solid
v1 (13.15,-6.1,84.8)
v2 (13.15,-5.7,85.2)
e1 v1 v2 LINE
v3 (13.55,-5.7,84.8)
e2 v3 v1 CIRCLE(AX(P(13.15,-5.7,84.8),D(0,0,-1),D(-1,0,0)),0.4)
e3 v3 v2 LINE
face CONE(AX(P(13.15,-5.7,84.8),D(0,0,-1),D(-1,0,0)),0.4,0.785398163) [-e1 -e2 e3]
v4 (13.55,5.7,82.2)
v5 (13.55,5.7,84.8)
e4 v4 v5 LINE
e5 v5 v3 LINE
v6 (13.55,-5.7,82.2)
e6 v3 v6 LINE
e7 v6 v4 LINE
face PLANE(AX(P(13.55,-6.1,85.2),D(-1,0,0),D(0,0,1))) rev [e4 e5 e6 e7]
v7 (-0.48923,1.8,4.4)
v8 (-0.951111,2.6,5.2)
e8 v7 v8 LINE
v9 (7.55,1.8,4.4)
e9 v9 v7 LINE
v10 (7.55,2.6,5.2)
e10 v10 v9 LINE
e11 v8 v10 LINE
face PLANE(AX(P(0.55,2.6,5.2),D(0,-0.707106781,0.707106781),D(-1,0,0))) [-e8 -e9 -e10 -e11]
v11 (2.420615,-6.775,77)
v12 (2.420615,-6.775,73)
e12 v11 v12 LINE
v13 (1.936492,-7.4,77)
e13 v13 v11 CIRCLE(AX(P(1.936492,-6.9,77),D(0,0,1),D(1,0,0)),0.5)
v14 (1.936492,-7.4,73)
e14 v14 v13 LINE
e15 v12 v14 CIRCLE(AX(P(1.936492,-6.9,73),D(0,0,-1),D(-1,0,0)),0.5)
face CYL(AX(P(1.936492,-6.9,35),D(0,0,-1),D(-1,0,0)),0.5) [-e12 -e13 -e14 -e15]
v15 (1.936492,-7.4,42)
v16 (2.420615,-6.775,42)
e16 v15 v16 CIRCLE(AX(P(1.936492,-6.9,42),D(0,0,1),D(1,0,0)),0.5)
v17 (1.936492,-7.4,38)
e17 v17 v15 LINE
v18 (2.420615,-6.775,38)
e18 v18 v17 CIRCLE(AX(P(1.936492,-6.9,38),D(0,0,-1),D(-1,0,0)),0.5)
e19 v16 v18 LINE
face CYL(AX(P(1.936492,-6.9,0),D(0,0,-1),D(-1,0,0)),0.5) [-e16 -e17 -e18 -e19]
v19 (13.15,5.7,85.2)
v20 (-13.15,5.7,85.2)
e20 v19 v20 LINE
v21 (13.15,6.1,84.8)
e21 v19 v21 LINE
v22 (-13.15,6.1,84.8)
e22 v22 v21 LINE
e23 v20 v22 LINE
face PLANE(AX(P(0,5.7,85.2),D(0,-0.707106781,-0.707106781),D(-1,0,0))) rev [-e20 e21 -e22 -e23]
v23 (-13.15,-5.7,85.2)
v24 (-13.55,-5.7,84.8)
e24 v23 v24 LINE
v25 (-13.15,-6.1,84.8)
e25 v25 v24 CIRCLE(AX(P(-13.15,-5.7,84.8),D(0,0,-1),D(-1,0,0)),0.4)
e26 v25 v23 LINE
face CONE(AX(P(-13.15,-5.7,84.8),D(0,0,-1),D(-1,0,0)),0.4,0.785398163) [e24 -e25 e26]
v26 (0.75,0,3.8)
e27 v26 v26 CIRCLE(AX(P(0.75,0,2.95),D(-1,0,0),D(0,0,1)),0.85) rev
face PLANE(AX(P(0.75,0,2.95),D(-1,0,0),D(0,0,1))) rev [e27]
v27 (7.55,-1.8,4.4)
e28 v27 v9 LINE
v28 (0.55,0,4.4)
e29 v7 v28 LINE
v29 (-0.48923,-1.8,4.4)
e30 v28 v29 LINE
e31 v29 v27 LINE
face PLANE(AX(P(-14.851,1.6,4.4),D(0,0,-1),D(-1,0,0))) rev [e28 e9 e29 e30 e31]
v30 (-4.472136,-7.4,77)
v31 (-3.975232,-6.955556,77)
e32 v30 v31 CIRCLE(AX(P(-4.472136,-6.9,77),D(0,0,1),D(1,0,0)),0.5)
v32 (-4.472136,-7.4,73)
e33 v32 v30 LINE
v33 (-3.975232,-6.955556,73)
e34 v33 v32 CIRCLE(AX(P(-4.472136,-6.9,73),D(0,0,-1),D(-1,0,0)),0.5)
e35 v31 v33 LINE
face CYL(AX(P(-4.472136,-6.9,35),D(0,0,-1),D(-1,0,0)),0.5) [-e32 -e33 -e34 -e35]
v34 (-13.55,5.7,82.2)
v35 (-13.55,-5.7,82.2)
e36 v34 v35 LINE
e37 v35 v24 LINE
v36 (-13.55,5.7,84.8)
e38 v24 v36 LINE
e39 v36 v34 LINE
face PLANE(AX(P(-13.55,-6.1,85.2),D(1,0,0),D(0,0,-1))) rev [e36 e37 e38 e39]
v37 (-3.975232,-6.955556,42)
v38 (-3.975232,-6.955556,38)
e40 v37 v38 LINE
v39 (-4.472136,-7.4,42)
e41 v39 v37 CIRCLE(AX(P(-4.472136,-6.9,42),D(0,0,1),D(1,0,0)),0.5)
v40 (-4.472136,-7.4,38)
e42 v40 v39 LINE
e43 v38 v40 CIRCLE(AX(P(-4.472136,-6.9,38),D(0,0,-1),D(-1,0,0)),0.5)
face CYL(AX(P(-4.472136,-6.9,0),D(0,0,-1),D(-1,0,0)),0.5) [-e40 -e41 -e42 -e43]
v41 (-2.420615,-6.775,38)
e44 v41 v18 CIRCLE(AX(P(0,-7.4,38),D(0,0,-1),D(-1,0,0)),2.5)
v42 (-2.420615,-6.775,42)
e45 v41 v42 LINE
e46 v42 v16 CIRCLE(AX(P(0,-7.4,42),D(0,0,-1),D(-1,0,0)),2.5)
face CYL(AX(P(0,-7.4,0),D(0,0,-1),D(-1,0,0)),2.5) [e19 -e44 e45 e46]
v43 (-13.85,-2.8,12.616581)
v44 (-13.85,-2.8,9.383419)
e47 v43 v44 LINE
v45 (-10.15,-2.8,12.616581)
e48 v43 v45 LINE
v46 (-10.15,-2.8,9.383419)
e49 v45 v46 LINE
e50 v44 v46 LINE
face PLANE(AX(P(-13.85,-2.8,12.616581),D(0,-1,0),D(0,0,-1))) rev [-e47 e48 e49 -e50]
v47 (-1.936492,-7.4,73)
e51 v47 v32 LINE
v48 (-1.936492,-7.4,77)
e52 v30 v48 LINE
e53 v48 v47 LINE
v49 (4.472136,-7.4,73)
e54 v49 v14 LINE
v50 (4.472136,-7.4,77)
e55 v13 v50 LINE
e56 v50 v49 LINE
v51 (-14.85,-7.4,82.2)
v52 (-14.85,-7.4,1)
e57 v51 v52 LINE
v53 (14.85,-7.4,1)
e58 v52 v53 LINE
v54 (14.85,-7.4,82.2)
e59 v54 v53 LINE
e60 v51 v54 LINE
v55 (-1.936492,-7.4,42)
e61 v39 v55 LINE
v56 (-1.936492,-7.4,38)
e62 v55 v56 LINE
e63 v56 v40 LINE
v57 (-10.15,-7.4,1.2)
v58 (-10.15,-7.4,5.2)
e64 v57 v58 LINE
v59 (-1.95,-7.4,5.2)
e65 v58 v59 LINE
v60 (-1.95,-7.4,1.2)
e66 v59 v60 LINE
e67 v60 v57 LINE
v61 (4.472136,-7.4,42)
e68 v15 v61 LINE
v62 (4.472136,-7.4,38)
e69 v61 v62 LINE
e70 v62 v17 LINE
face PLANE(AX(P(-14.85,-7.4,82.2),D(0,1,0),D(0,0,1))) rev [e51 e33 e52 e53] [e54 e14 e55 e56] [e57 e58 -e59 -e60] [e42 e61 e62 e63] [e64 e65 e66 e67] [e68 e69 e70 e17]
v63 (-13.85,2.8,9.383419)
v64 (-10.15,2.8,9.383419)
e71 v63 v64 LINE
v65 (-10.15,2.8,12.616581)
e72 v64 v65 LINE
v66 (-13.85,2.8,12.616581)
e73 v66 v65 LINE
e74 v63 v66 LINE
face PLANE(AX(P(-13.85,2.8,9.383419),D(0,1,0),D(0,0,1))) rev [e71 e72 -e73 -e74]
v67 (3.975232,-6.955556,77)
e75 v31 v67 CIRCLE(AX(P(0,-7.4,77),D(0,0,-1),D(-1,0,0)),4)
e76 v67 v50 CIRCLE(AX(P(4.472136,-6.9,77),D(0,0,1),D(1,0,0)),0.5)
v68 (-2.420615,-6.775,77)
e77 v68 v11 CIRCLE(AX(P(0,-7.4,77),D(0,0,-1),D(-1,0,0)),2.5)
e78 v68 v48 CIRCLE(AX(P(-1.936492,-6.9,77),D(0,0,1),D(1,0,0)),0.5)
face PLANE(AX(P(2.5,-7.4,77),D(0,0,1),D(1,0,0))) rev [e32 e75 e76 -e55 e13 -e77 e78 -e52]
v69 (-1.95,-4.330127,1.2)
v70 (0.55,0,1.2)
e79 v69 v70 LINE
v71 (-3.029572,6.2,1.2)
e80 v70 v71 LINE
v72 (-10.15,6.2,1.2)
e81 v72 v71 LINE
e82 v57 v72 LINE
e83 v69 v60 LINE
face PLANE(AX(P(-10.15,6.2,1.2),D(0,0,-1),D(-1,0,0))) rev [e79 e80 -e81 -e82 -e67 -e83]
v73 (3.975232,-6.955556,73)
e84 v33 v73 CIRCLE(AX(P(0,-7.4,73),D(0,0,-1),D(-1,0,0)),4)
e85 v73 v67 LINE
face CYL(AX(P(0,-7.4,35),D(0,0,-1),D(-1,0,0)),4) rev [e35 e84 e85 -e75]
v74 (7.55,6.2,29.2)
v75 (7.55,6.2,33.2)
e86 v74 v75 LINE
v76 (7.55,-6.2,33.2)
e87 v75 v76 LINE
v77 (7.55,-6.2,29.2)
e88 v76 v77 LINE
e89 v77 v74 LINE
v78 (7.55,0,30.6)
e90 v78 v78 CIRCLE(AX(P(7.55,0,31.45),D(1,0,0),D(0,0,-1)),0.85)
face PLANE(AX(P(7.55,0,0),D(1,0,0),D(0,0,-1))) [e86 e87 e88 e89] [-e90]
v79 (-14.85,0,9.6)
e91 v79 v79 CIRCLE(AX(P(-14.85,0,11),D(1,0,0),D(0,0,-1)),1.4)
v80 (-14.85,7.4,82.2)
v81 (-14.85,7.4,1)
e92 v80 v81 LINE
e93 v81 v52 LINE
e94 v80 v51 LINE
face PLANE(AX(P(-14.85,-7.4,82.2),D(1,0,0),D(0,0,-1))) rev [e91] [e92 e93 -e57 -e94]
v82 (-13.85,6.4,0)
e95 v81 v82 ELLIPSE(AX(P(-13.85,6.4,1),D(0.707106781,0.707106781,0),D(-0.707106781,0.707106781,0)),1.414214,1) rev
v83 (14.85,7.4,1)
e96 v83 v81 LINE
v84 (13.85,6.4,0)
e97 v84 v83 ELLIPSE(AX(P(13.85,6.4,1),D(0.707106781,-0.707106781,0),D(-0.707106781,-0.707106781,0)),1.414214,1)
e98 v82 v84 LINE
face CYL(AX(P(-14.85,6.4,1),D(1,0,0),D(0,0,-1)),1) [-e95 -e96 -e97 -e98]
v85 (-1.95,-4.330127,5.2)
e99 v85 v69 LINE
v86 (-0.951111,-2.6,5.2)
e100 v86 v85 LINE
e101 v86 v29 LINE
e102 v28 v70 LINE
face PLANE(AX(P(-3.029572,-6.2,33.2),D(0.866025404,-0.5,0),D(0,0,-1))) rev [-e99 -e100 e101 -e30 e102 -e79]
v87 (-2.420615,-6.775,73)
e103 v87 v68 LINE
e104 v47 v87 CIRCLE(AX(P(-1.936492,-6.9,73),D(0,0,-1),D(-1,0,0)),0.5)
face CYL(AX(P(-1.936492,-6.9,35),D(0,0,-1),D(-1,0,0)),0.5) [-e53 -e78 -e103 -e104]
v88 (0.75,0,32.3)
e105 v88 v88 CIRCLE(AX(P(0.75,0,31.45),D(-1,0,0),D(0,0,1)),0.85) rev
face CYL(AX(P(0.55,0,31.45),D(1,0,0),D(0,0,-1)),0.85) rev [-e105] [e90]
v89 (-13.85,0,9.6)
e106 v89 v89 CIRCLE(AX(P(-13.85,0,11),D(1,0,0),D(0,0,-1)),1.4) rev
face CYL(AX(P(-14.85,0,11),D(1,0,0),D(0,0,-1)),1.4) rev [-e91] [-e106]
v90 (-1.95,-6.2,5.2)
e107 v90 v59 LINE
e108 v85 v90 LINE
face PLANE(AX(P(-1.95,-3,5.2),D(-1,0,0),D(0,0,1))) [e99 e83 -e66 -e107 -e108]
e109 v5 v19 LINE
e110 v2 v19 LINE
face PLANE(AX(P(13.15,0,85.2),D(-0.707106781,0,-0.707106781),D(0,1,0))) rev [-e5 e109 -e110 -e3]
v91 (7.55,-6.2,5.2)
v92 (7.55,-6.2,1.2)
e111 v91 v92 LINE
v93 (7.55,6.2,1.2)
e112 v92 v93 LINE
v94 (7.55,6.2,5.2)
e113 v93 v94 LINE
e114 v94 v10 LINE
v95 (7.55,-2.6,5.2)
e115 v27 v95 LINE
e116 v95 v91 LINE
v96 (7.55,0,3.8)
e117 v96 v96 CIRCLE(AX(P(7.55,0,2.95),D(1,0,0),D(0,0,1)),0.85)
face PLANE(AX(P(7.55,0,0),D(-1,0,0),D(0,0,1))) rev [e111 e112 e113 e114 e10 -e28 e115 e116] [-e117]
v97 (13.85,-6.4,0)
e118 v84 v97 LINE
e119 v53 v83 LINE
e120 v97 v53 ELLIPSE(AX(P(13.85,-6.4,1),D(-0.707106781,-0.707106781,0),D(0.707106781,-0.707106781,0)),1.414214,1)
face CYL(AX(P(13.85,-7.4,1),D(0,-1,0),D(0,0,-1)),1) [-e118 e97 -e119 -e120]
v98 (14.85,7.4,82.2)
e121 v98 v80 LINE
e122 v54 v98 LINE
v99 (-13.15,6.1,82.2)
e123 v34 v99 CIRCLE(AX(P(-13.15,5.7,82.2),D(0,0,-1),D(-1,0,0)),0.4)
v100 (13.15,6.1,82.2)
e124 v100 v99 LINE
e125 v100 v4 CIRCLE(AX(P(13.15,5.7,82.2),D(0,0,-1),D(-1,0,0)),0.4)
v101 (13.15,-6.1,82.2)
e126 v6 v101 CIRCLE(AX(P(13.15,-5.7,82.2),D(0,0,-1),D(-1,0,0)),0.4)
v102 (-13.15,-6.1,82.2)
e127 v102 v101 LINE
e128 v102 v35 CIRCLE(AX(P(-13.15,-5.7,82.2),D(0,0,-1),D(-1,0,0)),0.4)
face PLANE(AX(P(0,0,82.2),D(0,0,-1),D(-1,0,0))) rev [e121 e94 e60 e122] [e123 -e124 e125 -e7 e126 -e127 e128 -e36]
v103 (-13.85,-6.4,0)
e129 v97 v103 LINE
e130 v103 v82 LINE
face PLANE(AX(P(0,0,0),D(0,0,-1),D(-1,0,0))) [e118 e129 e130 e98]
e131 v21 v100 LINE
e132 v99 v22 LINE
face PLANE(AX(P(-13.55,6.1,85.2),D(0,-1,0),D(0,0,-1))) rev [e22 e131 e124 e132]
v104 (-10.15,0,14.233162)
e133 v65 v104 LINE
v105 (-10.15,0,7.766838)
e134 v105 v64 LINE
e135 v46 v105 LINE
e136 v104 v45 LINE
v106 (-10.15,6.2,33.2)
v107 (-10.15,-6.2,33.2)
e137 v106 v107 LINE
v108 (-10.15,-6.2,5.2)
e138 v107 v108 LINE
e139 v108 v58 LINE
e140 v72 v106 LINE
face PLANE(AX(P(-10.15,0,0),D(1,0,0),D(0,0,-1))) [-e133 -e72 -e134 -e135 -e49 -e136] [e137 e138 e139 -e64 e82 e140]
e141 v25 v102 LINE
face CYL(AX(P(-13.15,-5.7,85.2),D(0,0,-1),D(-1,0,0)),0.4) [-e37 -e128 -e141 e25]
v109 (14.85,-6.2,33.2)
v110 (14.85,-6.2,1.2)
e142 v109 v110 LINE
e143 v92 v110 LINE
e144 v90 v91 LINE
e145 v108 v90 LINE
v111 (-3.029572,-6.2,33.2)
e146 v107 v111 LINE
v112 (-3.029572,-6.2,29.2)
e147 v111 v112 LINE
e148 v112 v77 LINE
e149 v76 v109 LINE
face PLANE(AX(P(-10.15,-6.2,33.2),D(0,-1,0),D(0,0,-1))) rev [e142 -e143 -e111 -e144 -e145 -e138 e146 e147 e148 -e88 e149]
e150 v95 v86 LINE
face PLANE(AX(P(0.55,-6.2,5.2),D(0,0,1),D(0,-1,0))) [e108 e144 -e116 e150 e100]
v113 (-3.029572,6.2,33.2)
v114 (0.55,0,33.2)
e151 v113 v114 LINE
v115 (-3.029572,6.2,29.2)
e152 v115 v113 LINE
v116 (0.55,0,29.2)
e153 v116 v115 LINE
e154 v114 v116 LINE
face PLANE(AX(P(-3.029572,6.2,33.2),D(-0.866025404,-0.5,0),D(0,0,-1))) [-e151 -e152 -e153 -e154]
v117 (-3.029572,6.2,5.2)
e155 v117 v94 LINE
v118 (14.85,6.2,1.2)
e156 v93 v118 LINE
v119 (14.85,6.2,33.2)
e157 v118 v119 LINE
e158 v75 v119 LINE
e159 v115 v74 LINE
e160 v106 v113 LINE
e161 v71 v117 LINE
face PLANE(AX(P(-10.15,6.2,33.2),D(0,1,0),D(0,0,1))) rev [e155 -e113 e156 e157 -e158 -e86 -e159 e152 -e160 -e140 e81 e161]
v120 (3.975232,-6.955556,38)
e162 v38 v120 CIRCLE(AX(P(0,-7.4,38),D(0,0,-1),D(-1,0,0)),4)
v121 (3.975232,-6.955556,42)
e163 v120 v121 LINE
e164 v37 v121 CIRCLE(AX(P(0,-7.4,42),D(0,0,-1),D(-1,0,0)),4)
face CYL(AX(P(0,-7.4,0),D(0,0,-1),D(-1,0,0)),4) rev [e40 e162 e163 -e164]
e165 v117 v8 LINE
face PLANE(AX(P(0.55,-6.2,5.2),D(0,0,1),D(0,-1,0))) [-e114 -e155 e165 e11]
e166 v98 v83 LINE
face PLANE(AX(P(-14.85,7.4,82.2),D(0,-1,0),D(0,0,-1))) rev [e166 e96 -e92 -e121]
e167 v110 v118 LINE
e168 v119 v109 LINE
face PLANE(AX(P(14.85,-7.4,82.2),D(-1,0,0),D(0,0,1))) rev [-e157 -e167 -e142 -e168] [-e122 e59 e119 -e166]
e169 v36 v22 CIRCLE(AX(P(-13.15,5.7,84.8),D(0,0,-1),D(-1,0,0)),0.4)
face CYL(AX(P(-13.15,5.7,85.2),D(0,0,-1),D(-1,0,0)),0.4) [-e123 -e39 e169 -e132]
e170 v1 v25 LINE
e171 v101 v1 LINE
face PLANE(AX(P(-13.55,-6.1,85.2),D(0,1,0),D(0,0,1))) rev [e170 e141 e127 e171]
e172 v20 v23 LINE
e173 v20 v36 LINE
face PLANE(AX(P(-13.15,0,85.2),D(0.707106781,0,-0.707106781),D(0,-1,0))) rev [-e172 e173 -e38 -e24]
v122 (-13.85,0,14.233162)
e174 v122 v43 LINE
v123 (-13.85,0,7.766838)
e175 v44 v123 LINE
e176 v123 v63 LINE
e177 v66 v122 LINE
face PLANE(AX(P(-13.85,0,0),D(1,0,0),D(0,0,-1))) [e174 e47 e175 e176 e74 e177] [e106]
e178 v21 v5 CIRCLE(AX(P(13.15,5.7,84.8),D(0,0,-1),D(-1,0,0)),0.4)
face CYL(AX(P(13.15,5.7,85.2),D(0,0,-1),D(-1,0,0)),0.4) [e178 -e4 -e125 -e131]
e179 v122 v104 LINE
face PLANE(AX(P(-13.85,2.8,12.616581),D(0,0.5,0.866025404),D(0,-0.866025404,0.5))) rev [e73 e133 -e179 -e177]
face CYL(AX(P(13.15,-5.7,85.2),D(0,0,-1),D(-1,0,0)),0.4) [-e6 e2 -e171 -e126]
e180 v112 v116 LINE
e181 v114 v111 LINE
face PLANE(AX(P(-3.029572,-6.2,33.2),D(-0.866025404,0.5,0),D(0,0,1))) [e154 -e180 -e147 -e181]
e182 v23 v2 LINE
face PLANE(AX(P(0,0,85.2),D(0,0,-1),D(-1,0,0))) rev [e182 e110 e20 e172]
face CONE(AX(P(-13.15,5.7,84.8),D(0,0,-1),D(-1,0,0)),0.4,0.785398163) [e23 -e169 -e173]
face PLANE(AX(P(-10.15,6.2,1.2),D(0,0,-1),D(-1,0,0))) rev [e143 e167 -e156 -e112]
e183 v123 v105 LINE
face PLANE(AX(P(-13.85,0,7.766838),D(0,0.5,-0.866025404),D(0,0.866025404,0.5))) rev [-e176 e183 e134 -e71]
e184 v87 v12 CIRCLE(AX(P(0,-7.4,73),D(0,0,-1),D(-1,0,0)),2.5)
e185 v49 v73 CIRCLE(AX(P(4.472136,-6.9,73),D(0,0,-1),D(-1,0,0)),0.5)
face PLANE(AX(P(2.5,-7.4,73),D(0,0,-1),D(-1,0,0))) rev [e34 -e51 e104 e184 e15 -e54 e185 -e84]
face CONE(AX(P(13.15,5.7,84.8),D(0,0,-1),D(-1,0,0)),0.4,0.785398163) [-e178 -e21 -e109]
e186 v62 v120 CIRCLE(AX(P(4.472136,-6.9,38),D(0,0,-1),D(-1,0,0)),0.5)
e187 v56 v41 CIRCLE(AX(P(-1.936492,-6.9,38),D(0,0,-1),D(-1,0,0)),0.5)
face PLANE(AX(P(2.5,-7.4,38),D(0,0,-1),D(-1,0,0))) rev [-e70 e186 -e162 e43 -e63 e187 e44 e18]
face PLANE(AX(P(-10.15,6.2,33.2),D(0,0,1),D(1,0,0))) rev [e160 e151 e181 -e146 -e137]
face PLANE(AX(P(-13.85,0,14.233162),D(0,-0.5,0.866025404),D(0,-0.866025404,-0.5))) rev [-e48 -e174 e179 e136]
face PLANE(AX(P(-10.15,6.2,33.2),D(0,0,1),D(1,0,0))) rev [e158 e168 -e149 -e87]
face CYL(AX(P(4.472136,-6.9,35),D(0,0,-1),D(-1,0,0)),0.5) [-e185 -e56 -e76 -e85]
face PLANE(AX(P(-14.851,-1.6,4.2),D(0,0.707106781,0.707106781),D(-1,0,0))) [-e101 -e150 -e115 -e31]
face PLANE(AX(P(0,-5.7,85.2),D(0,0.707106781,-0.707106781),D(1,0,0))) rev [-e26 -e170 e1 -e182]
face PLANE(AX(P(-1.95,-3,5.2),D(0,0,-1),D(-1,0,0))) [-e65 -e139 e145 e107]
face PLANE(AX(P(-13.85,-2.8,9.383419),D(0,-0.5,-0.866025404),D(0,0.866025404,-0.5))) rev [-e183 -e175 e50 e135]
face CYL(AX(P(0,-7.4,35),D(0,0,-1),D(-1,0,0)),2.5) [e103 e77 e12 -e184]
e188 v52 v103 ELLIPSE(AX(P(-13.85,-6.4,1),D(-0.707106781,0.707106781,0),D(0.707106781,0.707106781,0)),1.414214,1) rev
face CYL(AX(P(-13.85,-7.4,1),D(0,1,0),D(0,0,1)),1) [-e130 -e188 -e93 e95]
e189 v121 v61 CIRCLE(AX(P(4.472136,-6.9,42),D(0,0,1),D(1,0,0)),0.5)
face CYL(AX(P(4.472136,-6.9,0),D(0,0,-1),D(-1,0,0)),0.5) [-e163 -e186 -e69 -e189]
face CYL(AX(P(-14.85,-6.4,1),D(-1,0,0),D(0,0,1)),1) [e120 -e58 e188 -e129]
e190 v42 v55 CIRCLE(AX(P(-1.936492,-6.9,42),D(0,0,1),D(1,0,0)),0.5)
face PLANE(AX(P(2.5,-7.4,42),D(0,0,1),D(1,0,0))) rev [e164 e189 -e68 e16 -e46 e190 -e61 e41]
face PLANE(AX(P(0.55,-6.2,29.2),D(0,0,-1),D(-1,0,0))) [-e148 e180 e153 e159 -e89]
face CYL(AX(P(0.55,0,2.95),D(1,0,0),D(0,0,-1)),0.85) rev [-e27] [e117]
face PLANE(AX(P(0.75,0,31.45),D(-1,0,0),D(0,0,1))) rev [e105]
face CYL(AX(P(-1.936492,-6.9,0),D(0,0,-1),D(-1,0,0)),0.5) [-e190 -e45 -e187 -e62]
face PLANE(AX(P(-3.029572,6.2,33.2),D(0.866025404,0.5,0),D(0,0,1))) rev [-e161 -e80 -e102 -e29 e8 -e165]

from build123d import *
from OCP.BRepFilletAPI import BRepFilletAPI_MakeChamfer

# Parameters (mm, degrees)
IZIM1_W                     = 29.7
IZIM1_H                     = 14.8
Y_KSEKLIK_EKSTR_ZYON1_DEPTH = 82.2
IZIM2_W                     = 32
IZIM2_H                     = 12.4
KES_EKSTR_ZYON1_DEPTH       = 25
Y_KSEKLIK_EKSTR_ZYON2_START = -7.3
IZIM3_W                     = 4
IZIM3_H                     = 12.4
IZIM3_R                     = 0.85
Y_KSEKLIK_EKSTR_ZYON2_DEPTH = 7
Y_KSEKLIK_EKSTR_ZYON3_START = -0.2
IZIM4_R                     = 0.85
Y_KSEKLIK_EKSTR_ZYON3_DEPTH = 0.2
PAH1_SIZE                   = 3.579571669
PAH1_SIZE_2                 = 6.2
KES_EKSTR_ZYON2_DEPTH       = 3.2
KES_EKSTR_ZYON2_DEPTH_BACK  = 85.630505729
IZIM5_W                     = 8.2
IZIM5_H                     = 4
RADYUS1_R                   = 1
IZIM7_R                     = 1.4
KES_EKSTR_ZYON3_DEPTH       = 87.235723456
IZIM8_W                     = 27.1
IZIM8_H                     = 12.2
Y_KSEKLIK_EKSTR_ZYON4_DEPTH = 3
RADYUS2_R                   = 0.4
IZIM9_W                     = 1.5
IZIM9_H                     = 4
L_O_ALTMA1_COUNT            = 2
L_O_ALTMA1_PITCH            = 35
RADYUS3_R                   = 0.5
KES_EKSTR_ZYON4_REACH       = 90.406
IZIM10_W                    = 0.8
IZIM10_H                    = 3.2
PAH3_SIZE                   = 1
PAH4_SIZE                   = 0.4
KES_EKSTR_ZYON5_DEPTH       = 3.7


# Some blends are built 0.0001 mm under size
with BuildPart() as part:
    # Çizim1 → Yükseklik-Ekstrüzyon1 (new body)
    with BuildSketch(Plane.XY):
        Rectangle(IZIM1_W, IZIM1_H)
    extrude(amount=Y_KSEKLIK_EKSTR_ZYON1_DEPTH)

    # Çizim2 → Kes-Ekstrüzyon1 (cut)
    with BuildSketch(Plane(origin=(14.85, 0, 0), x_dir=(0, 0, -1), z_dir=(1, 0, 0))):
        with Locations((-17.2, 0)):
            Rectangle(IZIM2_W, IZIM2_H)
    extrude(amount=-KES_EKSTR_ZYON1_DEPTH, mode=Mode.SUBTRACT)

    # Çizim3 → Yükseklik-Ekstrüzyon2 (add)
    # profile 1 of 2: a face of its own
    with BuildSketch(Plane(origin=(14.85, 0, 0), x_dir=(0, 0, -1), z_dir=(1, 0, 0)).offset(Y_KSEKLIK_EKSTR_ZYON2_START)):
        with Locations((-31.2, 0)):
            Rectangle(IZIM3_W, IZIM3_H)
        with Locations((-31.45, 0)):
            Circle(IZIM3_R, mode=Mode.SUBTRACT)
    # profile 2 of 2: a face of its own
    with BuildSketch(Plane(origin=(14.85, 0, 0), x_dir=(0, 0, -1), z_dir=(1, 0, 0)).offset(Y_KSEKLIK_EKSTR_ZYON2_START)):
        with Locations((-3.2, 0)):
            Rectangle(IZIM3_W, IZIM3_H)
        with Locations(Location((-2.95, 0, 0), (0, 0, 180))):
            Circle(IZIM3_R, mode=Mode.SUBTRACT)
    extrude(amount=-Y_KSEKLIK_EKSTR_ZYON2_DEPTH)

    # Çizim4 → Yükseklik-Ekstrüzyon3 (add)
    with BuildSketch(Plane.ZY.offset(-0.55).offset(Y_KSEKLIK_EKSTR_ZYON3_START)):
        with Locations(Location((31.45, 0, 0), (0, 0, 180))):
            Circle(IZIM4_R)
        with Locations((2.95, 0)):
            Circle(IZIM4_R)
    extrude(amount=Y_KSEKLIK_EKSTR_ZYON3_DEPTH)

    # Pah1
    pah1_edges_1 = [part.edges().sort_by_distance(p)[0] for p in [
        (0.55, -6.2, 3.2),
    ]]
    pah1_side_1 = [part.faces().sort_by_distance(p)[0] for p in [
        (0.478408567, -6.2, 3.2),
    ]]
    pah1_edges_2 = [part.edges().sort_by_distance(p)[0] for p in [
        (0.55, 6.2, 3.2),
    ]]
    pah1_side_2 = [part.faces().sort_by_distance(p)[0] for p in [
        (0.478408567, 6.2, 3.2),
    ]]
    pah1_edges_3 = [part.edges().sort_by_distance(p)[0] for p in [
        (0.55, -6.2, 31.2),
    ]]
    pah1_side_3 = [part.faces().sort_by_distance(p)[0] for p in [
        (0.478408567, -6.2, 31.2),
    ]]
    pah1_edges_4 = [part.edges().sort_by_distance(p)[0] for p in [
        (0.55, 6.2, 31.2),
    ]]
    pah1_side_4 = [part.faces().sort_by_distance(p)[0] for p in [
        (0.478408567, 6.2, 31.2),
    ]]
    pah1 = BRepFilletAPI_MakeChamfer(part.part.solid().wrapped)
    for e in pah1_edges_1:
        pah1.Add(PAH1_SIZE - 0.0001, PAH1_SIZE_2 - 0.0001, e.wrapped, pah1_side_1[0].wrapped)
    for e in pah1_edges_2:
        pah1.Add(PAH1_SIZE - 0.0001, PAH1_SIZE_2 - 0.0001, e.wrapped, pah1_side_2[0].wrapped)
    for e in pah1_edges_3:
        pah1.Add(PAH1_SIZE - 0.0001, PAH1_SIZE_2 - 0.0001, e.wrapped, pah1_side_3[0].wrapped)
    for e in pah1_edges_4:
        pah1.Add(PAH1_SIZE - 0.0001, PAH1_SIZE_2 - 0.0001, e.wrapped, pah1_side_4[0].wrapped)
    add(Compound.cast(pah1.Shape()), mode=Mode.REPLACE)  # a hair under: the kernel refuses the full size

    # Çizim5 → Kes-Ekstrüzyon2 (cut, two sides: drawn at the far end of the back side and taken through both)
    with BuildSketch(Plane(origin=(0, -6.2, 0), x_dir=(1, 0, 0), z_dir=(0, 1, 0)).offset(-KES_EKSTR_ZYON2_DEPTH_BACK)):
        with Locations((-6.05, -3.2)):
            Rectangle(IZIM5_W, IZIM5_H)
    extrude(amount=KES_EKSTR_ZYON2_DEPTH + KES_EKSTR_ZYON2_DEPTH_BACK, mode=Mode.SUBTRACT)

    # Radyus1
    radyus1_edges = [part.edges().sort_by_distance(p)[0] for p in [
        (0, -7.4, 0),
        (-14.85, 0, 0),
        (0, 7.4, 0),
        (14.85, 0, 0),
    ]]
    fillet(radyus1_edges, radius=RADYUS1_R)

    # Çizim7 → Kes-Ekstrüzyon3 (cut, through all)
    with BuildSketch(Plane(origin=(-10.15, 0, 0), x_dir=(0, 0, -1), z_dir=(1, 0, 0))):
        with Locations((-11, 0)):
            Circle(IZIM7_R)
    extrude(amount=-KES_EKSTR_ZYON3_DEPTH, mode=Mode.SUBTRACT)

    # Çizim8 → Yükseklik-Ekstrüzyon4 (add)
    with BuildSketch(Plane.XY.offset(82.2)):
        Rectangle(IZIM8_W, IZIM8_H)
    extrude(amount=Y_KSEKLIK_EKSTR_ZYON4_DEPTH)

    # Radyus2
    radyus2_edges = [part.edges().sort_by_distance(p)[0] for p in [
        (13.55, -6.1, 83.7),
        (13.55, 6.1, 83.7),
        (-13.55, 6.1, 83.7),
        (-13.55, -6.1, 83.7),
    ]]
    fillet(radyus2_edges, radius=RADYUS2_R)

    # Çizim9 → Kes-Döndür1 (revolve, cut)
    with BuildSketch(Plane.XZ.offset(7.4)):
        with Locations((3.25, 40)):
            Rectangle(IZIM9_W, IZIM9_H)
    kes_d_nd_r1 = revolve(axis=Axis((0, -7.4, 0), (0, 0, 1)), mode=Mode.SUBTRACT)

    # LÇoğaltma1: Kes-Döndür1 ×2
    with Locations(*[(0, 0, i * L_O_ALTMA1_PITCH) for i in range(1, L_O_ALTMA1_COUNT)]):
        add(kes_d_nd_r1, mode=Mode.SUBTRACT)

    # Radyus3
    radyus3_edges = [part.edges().sort_by_distance(p)[0] for p in [
        (2.5, -7.4, 40),
        (4, -7.4, 40),
        (-2.5, -7.4, 40),
        (-4, -7.4, 40),
        (4, -7.4, 75),
        (-4, -7.4, 75),
        (2.5, -7.4, 75),
        (-2.5, -7.4, 75),
    ]]
    fillet(radyus3_edges, radius=RADYUS3_R)

    # Çizim10 → Kes-Ekstrüzyon4 (cut, up to next)
    with BuildSketch(Plane(origin=(7.55, 0, 0), x_dir=(0, 0, -1), z_dir=(1, 0, 0)), mode=Mode.PRIVATE) as kes_ekstr_zyon4_sk1:
        with Locations((-4.8, 0)):
            Rectangle(IZIM10_W, IZIM10_H)
    kes_ekstr_zyon4_tool1 = extrude(kes_ekstr_zyon4_sk1.sketch, amount=-KES_EKSTR_ZYON4_REACH, mode=Mode.PRIVATE) & part.part
    add(kes_ekstr_zyon4_tool1.solids().sort_by_distance((7.55, 0, 4.8))[0], mode=Mode.SUBTRACT)

    # Pah3
    # the kernel refuses this chamfer: 1 mm, written as the material it takes off along each edge
    with BuildSketch(Plane(origin=(10.121682988, -1.6, 5.2), x_dir=(0, -0.9996219169112968, 0.027495876610586473), z_dir=(-1, 0, 0))) as pah3_piece_1_section:
        Polygon((PAH3_SIZE * 0.999621916911, -PAH3_SIZE * 0.0274958766106), (-PAH3_SIZE * 0.0274958766106, -PAH3_SIZE * 0.999621916911), (0, 0), align=None)
    pah3_piece_1 = extrude(amount=13.067057765, mode=Mode.PRIVATE)
    pah3_piece_1 = split(pah3_piece_1, bisect_by=Plane(origin=(3.588154105, -1.945718412, 4.4), z_dir=(0, 0, 1)), keep=Keep.TOP, mode=Mode.PRIVATE)
    add(pah3_piece_1, mode=Mode.SUBTRACT)
    with BuildSketch(Plane(origin=(10.121682988, 1.6, 5.2), x_dir=(0, 0.9996219169112968, 0.027495876610586487), z_dir=(-1, 0, 0))) as pah3_piece_2_section:
        Polygon((PAH3_SIZE * 0.999621916911, PAH3_SIZE * 0.0274958766106), (-PAH3_SIZE * 0.0274958766106, PAH3_SIZE * 0.999621916911), (0, 0), align=None)
    pah3_piece_2 = extrude(amount=13.067057765, mode=Mode.PRIVATE)
    pah3_piece_2 = split(pah3_piece_2, bisect_by=Plane(origin=(3.588154105, 1.945718412, 4.4), z_dir=(0, 0, 1)), keep=Keep.TOP, mode=Mode.PRIVATE)
    add(pah3_piece_2, mode=Mode.SUBTRACT)

    # Pah4
    pah4_edges = [part.edges().sort_by_distance(p)[0] for p in [
        (13.55, 0, 85.2),
        (0, -6.1, 85.2),
        (0, 6.1, 85.2),
        (-13.55, 0, 85.2),
        (-13.432842712, 5.982842712, 85.2),
        (13.432842712, 5.982842712, 85.2),
        (-13.432842712, -5.982842712, 85.2),
        (13.432842712, -5.982842712, 85.2),
    ]]
    chamfer(pah4_edges, length=PAH4_SIZE)

    # Çizim12 → Kes-Ekstrüzyon5 (cut)
    with BuildSketch(Plane(origin=(-10.15, 0, 0), x_dir=(0, 0, -1), z_dir=(1, 0, 0))):
        Polygon((-7.766838493, 0), (-9.383419246, 2.8), (-12.616580754, 2.8), (-14.233161507, 0), (-12.616580754, -2.8), (-9.383419246, -2.8), align=None)
    extrude(amount=-KES_EKSTR_ZYON5_DEPTH, mode=Mode.SUBTRACT)


solid = part.part
